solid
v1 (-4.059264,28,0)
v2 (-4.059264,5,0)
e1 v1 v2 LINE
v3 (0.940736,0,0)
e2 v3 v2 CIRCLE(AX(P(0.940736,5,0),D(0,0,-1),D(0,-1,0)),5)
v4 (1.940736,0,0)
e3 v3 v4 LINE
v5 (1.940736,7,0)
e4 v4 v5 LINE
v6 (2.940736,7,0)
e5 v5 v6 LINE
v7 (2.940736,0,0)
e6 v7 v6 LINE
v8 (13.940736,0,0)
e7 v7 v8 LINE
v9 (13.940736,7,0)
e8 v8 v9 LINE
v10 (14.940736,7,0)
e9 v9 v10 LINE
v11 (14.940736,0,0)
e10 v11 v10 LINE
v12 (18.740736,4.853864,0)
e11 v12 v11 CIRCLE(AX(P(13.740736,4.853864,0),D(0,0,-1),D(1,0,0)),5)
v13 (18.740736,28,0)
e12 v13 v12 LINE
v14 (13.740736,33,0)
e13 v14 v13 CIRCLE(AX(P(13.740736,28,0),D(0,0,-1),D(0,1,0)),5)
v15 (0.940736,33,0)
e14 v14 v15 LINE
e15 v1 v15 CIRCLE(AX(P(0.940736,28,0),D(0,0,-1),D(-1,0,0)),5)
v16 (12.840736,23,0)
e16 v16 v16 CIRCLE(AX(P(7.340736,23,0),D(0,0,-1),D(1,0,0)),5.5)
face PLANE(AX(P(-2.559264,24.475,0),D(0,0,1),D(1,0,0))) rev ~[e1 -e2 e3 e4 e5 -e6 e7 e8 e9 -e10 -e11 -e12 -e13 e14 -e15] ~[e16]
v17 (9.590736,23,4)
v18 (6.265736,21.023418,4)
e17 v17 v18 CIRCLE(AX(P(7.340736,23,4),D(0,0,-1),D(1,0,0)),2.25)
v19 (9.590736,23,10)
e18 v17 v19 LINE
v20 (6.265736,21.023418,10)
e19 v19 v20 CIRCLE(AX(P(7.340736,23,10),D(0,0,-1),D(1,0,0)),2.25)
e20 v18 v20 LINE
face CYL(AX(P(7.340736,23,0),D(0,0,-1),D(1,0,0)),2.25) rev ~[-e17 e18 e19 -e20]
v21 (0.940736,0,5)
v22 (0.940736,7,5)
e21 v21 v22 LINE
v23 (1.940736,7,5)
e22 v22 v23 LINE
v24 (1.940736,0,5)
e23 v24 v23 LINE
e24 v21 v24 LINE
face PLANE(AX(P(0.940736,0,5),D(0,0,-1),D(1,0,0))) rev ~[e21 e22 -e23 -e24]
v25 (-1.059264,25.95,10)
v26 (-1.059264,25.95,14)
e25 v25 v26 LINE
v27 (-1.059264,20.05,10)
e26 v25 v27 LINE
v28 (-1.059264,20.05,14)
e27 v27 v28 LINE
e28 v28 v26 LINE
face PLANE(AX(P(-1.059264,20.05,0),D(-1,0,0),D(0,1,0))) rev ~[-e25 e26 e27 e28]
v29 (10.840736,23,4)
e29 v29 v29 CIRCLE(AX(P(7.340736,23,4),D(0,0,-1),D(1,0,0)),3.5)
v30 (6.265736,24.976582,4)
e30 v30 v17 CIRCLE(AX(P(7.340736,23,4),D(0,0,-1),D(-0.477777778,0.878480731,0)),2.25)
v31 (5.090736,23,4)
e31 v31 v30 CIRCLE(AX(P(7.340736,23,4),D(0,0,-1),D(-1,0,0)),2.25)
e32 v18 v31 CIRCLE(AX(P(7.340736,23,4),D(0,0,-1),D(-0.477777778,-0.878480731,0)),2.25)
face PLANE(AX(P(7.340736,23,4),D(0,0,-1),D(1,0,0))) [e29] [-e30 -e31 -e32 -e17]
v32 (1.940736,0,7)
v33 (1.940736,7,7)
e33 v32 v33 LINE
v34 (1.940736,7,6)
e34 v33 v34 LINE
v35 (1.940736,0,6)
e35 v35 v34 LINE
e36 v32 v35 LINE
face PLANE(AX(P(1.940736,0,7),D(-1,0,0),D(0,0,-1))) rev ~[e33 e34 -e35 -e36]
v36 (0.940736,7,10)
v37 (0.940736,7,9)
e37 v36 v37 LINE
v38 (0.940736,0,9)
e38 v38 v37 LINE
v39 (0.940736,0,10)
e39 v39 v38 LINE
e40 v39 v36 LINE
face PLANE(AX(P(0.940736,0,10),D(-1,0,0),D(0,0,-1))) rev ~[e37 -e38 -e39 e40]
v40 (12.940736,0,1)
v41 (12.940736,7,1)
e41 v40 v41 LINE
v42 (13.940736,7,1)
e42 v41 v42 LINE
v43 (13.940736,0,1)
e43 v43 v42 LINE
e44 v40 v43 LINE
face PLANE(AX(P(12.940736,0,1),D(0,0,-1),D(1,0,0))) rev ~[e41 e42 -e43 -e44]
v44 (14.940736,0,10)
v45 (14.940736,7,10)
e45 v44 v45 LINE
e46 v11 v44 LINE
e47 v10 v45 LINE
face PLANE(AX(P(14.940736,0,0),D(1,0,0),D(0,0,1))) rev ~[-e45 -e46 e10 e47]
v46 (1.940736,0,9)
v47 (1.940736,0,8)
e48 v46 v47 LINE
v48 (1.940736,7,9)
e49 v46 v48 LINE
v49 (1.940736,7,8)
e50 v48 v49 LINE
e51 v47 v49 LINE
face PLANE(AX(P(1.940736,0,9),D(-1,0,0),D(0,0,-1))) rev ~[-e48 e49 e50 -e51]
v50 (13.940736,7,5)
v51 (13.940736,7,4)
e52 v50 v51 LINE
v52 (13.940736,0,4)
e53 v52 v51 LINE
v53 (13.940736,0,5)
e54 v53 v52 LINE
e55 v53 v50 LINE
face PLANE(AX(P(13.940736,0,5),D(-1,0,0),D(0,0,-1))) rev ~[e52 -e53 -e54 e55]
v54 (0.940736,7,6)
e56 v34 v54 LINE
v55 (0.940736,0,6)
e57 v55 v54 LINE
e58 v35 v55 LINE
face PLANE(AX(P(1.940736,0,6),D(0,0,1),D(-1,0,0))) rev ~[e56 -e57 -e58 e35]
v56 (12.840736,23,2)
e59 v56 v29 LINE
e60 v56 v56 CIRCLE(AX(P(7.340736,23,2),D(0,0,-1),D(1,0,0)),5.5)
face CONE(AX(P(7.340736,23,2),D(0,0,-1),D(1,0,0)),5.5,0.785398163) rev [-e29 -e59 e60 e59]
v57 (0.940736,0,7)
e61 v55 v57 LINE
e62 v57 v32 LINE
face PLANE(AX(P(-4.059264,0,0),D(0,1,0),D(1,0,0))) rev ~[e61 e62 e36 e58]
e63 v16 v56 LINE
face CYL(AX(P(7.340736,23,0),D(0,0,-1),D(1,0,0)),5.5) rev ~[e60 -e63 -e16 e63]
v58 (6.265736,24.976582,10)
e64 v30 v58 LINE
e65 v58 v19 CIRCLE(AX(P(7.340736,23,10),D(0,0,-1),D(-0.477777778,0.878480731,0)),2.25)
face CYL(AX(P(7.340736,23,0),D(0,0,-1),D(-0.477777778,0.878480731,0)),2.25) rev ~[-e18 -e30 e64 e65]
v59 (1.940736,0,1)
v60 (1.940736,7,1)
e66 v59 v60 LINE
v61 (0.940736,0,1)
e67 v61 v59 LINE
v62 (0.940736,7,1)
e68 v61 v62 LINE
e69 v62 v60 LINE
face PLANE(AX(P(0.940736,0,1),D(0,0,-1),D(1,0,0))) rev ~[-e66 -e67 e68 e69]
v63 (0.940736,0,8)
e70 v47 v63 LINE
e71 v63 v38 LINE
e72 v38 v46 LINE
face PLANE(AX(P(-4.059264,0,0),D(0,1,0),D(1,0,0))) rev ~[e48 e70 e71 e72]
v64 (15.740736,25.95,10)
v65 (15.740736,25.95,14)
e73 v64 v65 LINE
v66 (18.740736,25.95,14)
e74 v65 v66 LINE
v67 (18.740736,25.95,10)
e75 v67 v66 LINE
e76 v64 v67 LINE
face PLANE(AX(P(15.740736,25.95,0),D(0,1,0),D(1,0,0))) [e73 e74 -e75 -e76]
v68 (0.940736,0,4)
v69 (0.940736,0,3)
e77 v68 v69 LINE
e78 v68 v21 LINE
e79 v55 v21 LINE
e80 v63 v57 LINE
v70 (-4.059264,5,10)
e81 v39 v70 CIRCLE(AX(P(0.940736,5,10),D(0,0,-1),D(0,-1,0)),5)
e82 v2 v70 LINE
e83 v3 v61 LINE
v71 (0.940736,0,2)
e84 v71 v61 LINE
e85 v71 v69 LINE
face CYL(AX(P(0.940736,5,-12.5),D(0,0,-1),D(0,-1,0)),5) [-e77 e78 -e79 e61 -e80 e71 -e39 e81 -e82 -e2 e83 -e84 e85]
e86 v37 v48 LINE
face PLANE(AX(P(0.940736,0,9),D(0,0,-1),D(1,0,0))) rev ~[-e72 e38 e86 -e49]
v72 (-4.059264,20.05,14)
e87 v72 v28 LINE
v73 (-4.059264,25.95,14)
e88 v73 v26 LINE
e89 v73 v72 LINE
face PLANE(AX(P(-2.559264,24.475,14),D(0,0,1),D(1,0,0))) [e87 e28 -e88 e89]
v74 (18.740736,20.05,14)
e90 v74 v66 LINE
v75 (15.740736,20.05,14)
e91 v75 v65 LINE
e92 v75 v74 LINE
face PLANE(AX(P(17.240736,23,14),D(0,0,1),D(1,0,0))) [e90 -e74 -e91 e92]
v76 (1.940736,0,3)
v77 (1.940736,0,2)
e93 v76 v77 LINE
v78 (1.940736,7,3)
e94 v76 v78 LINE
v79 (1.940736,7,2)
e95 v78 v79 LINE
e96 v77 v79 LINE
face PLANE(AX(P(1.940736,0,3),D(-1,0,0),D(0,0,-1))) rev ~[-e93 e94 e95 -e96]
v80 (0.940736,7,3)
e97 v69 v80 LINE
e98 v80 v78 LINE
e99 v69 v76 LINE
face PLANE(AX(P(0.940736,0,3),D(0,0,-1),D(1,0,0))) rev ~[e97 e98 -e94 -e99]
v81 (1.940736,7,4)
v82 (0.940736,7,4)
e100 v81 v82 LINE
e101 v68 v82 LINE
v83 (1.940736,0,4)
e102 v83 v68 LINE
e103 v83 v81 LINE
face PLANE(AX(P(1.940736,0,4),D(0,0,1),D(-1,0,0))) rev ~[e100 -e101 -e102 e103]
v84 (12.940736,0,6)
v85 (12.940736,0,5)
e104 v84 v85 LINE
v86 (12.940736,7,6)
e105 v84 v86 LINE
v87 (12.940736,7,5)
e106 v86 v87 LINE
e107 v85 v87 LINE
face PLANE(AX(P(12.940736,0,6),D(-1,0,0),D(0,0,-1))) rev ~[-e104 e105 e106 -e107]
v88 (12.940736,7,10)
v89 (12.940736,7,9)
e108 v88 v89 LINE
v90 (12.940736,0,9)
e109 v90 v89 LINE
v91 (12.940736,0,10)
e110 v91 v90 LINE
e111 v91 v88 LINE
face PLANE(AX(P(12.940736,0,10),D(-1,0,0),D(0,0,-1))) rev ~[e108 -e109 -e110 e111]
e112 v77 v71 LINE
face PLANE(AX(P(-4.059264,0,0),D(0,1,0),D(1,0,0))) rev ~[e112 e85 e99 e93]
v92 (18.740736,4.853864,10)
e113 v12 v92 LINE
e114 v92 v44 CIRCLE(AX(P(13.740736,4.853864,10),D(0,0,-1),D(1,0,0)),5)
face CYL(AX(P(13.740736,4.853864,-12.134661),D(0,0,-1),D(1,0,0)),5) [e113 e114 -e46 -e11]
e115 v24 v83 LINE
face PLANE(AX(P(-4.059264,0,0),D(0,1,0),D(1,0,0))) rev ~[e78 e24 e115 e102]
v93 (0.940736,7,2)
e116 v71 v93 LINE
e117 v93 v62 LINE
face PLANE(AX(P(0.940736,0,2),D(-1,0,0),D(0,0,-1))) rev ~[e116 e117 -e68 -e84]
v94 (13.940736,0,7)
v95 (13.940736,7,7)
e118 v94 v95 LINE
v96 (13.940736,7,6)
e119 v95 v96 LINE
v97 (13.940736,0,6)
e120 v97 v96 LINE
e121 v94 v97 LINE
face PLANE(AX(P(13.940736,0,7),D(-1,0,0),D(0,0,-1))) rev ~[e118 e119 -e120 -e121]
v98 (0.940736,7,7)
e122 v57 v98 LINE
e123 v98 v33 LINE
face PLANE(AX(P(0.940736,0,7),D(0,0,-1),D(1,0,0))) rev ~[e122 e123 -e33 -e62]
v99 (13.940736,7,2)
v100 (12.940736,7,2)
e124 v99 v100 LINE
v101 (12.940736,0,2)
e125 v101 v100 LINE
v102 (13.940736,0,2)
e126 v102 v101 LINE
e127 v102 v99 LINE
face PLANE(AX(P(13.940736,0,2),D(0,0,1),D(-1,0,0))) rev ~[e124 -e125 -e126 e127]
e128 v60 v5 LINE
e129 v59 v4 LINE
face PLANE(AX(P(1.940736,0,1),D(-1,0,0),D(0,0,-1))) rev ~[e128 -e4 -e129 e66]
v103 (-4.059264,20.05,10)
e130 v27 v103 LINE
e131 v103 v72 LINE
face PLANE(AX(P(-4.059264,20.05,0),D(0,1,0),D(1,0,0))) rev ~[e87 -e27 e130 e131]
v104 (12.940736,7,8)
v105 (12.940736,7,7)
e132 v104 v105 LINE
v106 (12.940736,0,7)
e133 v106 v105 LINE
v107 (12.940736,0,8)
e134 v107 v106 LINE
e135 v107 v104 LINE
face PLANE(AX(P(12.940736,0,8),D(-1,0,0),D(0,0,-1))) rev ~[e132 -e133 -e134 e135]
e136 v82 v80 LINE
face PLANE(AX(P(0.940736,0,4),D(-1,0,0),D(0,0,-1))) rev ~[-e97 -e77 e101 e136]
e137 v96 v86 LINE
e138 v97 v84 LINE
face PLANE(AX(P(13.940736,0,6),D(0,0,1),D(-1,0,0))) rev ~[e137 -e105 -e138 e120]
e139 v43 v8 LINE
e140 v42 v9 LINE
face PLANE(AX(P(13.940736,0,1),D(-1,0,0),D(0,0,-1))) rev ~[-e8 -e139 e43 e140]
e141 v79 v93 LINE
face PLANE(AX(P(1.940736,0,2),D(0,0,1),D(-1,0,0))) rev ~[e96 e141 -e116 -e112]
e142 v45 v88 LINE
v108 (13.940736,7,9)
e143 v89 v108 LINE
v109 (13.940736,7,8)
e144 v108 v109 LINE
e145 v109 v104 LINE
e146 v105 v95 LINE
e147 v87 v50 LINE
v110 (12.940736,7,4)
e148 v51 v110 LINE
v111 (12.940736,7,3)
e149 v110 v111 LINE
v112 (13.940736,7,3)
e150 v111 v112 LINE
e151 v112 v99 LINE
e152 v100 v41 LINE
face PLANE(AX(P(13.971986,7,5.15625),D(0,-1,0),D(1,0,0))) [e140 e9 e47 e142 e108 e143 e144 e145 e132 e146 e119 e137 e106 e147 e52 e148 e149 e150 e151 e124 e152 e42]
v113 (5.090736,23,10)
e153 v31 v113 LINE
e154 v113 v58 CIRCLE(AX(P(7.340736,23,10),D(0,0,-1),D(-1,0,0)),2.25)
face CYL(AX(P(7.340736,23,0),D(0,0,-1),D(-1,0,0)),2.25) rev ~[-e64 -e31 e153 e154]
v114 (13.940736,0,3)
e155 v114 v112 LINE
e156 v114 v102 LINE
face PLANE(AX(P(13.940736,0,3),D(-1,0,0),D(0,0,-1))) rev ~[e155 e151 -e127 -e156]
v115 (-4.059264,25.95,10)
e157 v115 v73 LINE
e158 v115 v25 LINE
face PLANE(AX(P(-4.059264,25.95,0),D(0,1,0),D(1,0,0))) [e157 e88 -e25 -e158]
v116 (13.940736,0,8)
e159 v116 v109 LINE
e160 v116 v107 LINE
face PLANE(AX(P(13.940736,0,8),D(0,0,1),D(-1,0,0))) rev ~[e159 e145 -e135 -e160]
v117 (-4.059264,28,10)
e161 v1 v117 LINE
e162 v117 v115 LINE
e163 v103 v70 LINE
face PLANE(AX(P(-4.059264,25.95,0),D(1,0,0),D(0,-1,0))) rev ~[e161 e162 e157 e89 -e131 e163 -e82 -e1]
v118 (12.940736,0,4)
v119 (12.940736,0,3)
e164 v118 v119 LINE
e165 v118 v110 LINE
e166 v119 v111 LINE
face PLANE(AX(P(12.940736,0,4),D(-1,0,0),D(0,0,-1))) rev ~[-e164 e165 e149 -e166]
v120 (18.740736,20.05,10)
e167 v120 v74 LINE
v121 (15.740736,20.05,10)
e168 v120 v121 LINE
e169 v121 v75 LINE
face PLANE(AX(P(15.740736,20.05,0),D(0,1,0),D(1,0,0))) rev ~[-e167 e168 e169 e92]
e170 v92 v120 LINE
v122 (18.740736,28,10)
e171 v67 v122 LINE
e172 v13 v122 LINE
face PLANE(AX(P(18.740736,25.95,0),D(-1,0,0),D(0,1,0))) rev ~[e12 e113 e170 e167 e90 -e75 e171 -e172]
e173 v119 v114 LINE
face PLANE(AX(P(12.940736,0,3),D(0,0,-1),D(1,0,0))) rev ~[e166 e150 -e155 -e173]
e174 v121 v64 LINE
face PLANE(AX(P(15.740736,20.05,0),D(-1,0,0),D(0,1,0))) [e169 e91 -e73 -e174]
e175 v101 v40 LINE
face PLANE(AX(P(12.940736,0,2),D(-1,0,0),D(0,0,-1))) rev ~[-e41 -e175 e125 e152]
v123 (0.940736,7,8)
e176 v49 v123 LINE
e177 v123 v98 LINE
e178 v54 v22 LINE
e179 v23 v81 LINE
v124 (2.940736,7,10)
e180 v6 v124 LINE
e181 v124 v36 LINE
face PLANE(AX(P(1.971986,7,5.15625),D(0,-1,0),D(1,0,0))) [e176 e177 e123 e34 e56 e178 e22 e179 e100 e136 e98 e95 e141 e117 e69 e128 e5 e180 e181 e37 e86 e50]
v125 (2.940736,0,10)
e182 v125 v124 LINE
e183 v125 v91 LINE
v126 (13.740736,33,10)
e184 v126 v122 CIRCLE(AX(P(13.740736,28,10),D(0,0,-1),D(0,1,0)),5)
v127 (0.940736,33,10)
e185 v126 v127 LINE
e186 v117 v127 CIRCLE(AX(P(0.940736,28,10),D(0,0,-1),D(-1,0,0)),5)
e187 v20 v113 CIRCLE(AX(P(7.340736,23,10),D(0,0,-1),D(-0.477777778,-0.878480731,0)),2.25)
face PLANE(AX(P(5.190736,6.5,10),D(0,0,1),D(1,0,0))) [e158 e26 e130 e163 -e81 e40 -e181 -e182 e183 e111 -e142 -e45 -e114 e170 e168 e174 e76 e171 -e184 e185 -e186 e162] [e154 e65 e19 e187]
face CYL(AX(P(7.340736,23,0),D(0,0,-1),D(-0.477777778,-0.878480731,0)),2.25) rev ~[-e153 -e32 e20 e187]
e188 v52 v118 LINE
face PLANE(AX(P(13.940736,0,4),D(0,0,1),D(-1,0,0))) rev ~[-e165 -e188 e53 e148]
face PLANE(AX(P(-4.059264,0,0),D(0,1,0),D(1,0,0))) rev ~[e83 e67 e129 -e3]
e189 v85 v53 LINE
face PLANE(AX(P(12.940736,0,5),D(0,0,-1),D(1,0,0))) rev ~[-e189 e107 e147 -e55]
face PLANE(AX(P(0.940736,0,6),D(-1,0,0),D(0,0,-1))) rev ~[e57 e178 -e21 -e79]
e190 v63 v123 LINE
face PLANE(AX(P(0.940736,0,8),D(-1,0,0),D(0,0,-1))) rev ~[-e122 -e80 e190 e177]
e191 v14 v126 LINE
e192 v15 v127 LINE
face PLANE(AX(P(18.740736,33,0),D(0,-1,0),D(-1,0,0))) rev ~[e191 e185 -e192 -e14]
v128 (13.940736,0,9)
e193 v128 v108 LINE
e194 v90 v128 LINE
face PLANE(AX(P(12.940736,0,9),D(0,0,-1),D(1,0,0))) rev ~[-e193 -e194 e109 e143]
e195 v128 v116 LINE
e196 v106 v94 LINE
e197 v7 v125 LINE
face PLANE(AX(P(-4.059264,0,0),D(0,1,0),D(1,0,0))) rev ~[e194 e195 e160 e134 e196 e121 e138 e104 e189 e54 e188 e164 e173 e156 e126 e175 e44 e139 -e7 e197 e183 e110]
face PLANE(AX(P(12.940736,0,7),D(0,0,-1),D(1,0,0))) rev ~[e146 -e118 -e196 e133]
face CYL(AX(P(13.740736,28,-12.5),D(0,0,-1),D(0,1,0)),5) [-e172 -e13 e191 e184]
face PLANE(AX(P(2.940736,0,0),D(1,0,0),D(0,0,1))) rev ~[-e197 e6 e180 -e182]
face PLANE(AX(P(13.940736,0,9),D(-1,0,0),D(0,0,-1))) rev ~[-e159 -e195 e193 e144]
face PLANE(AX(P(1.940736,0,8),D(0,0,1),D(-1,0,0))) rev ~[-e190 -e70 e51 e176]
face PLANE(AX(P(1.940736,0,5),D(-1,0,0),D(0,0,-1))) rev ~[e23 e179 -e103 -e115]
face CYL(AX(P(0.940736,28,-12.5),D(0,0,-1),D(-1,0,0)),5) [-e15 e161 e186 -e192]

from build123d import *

# Parameters (mm, degrees)
F0_W        = 18.5
F0_H        = 13
F0_W_2      = 4.3
F0_W_3      = 3
F0_H_2      = 2.95
F1_DEPTH    = 10
F3_DEPTH    = 7
F4_T1_DEPTH = 35
F4_T3_DEPTH = 34.269322199
F0_H_3      = 5.9
F5_DEPTH    = 14
F6_R        = 5.5
F7_DEPTH    = 4
F8_SIZE     = 2


# Not quite as in the source:
# - a fillet or chamfer that OpenCascade refuses, or shapes differently, is made with other operations: its cross-section is extruded or revolved along the edge and cut away or added


with BuildPart() as f1:
    # F0 (on Top) → F1 (new body)
    with BuildSketch(Plane.XY):
        with Locations((5.190736489, 6.5)):
            Rectangle(F0_W, F0_H)
        with Locations((16.590736489, 6.5)):
            Rectangle(F0_W_2, F0_H)
        Polygon((14.440736489, 20.05), (14.440736489, 13), (18.740736489, 13), (18.740736489, 20.05), (15.740736489, 20.05), (15.740736489, 25.95), (18.740736489, 25.95), (18.740736489, 33), (14.440736489, 33), (14.440736489, 25.95), (14.440736489, 23), align=None)
        with BuildLine():
            Line((-4.059263511, 20.05), (-4.059263511, 13))
            Line((-4.059263511, 13), (14.440736489, 13))
            Line((14.440736489, 13), (14.440736489, 20.05))
            Line((14.440736489, 20.05), (11.440736489, 20.05))
            Line((11.440736489, 20.05), (11.440736489, 23))
            Line((11.440736489, 23), (9.590736489, 23))
            ThreePointArc((9.590736489, 23), (8.4904647177, 21.0659304563), (6.265736489, 21.0234183548))
            ThreePointArc((6.265736489, 21.0234183548), (4.0410082602, 21.0659304563), (2.940736489, 23))
            Line((2.940736489, 23), (-1.059263511, 23))
            Line((-1.059263511, 23), (-1.059263511, 20.05))
            Line((-1.059263511, 20.05), (-4.059263511, 20.05))
        make_face()
        with Locations((12.940736489, 21.525)):
            Rectangle(F0_W_3, F0_H_2)
        with Locations((12.940736489, 24.475)):
            Rectangle(F0_W_3, F0_H_2)
        with BuildLine():
            Line((-4.059263511, 33), (-4.059263511, 25.95))
            Line((-4.059263511, 25.95), (-1.059263511, 25.95))
            Line((-1.059263511, 25.95), (-1.059263511, 23))
            Line((-1.059263511, 23), (2.940736489, 23))
            ThreePointArc((2.940736489, 23), (4.0410082602, 24.9340695437), (6.265736489, 24.9765816452))
            ThreePointArc((6.265736489, 24.9765816452), (8.4904647177, 24.9340695437), (9.590736489, 23))
            Line((9.590736489, 23), (11.440736489, 23))
            Line((11.440736489, 23), (11.440736489, 25.95))
            Line((11.440736489, 25.95), (14.440736489, 25.95))
            Line((14.440736489, 25.95), (14.440736489, 33))
            Line((14.440736489, 33), (-4.059263511, 33))
        make_face()
        with BuildLine():
            Line((5.090736489, 23), (2.940736489, 23))
            ThreePointArc((2.940736489, 23), (4.0410082602, 21.0659304563), (6.265736489, 21.0234183548))
            ThreePointArc((6.265736489, 21.0234183548), (5.4066669452, 21.8502717712), (5.090736489, 23))
        make_face()
        with BuildLine():
            ThreePointArc((6.265736489, 24.9765816452), (4.0410082602, 24.9340695437), (2.940736489, 23))
            Line((2.940736489, 23), (5.090736489, 23))
            ThreePointArc((5.090736489, 23), (5.4066669452, 24.1497282288), (6.265736489, 24.9765816452))
        make_face()
    extrude(amount=F1_DEPTH)

    # F2 (on face) → F3 (cut)
    with BuildSketch(Plane.XZ):
        Polygon((2.940736489, 10), (0.940736489, 10), (0.940736489, 9), (1.940736489, 9), (1.940736489, 8), (0.940736489, 8), (0.940736489, 7), (1.940736489, 7), (1.940736489, 6), (0.940736489, 6), (0.940736489, 5), (1.940736489, 5), (1.940736489, 4), (0.940736489, 4), (0.940736489, 3), (1.940736489, 3), (1.940736489, 2), (0.940736489, 2), (0.940736489, 1), (1.940736489, 1), (1.940736489, 0), (2.940736489, 0), align=None)
        Polygon((14.940736489, 10), (12.940736489, 10), (12.940736489, 9), (13.940736489, 9), (13.940736489, 8), (12.940736489, 8), (12.940736489, 7), (13.940736489, 7), (13.940736489, 6), (12.940736489, 6), (12.940736489, 5), (13.940736489, 5), (13.940736489, 4), (12.940736489, 4), (12.940736489, 3), (13.940736489, 3), (13.940736489, 2), (12.940736489, 2), (12.940736489, 1), (13.940736489, 1), (13.940736489, 0), (14.940736489, 0), align=None)
    extrude(amount=-F3_DEPTH, mode=Mode.SUBTRACT)

    # F4: fillet of radius 5 on 4 edges, made by hand

    # F4_s2 → F4_t1 (cut)
    with BuildSketch(Plane.XY.offset(-12.5)):
        with BuildLine():
            ThreePointArc((-4.059263511, 28), (-2.594797417, 31.5355339059), (0.940736489, 33))
            Line((0.940736489, 33), (-4.059263511, 33))
            Line((-4.059263511, 33), (-4.059263511, 28))
        make_face()
        with BuildLine():
            ThreePointArc((0.940736489, 0), (-2.594797417, 1.4644660941), (-4.059263511, 5))
            Line((-4.059263511, 5), (-4.059263511, 0))
            Line((-4.059263511, 0), (0.940736489, 0))
        make_face()
        with BuildLine():
            ThreePointArc((13.740736489, 33), (17.2762703949, 31.5355339059), (18.740736489, 28))
            Line((18.740736489, 28), (18.740736489, 33))
            Line((18.740736489, 33), (13.740736489, 33))
        make_face()
    extrude(amount=F4_T1_DEPTH, mode=Mode.SUBTRACT)

    # F4_s4 → F4_t3 (cut)
    with BuildSketch(Plane.XY.offset(-12.1346610995)):
        with BuildLine():
            ThreePointArc((18.740736489, 4.8538644398), (17.677740426, 1.7716574383), (14.940736489, 0))
            Line((14.940736489, 0), (18.740736489, 0))
            Line((18.740736489, 0), (18.740736489, 4.8538644398))
        make_face()
    extrude(amount=F4_T3_DEPTH, mode=Mode.SUBTRACT)

    # F0 (on Top) → F5 (join)
    with BuildSketch(Plane.XY):
        with Locations((-2.559263511, 24.475)):
            Rectangle(F0_W_3, F0_H_2)
        with Locations((-2.559263511, 21.525)):
            Rectangle(F0_W_3, F0_H_2)
        with Locations((17.240736489, 23)):
            Rectangle(F0_W_3, F0_H_3)
    extrude(amount=F5_DEPTH)

    # F6 (on face) → F7 (cut)
    with BuildSketch(Plane(origin=(0, 0, 0), x_dir=(1, 0, 0), z_dir=(0, 0, -1))):
        with Locations((7.340736489, -23)):
            Circle(F6_R)
    extrude(amount=-F7_DEPTH, mode=Mode.SUBTRACT)

    # F8
    f8_edges = [f1.edges().sort_by_distance(p)[0] for p in [
        (1.840736, 23, 4),
    ]]
    chamfer(f8_edges, length=F8_SIZE)


solid = f1.part
